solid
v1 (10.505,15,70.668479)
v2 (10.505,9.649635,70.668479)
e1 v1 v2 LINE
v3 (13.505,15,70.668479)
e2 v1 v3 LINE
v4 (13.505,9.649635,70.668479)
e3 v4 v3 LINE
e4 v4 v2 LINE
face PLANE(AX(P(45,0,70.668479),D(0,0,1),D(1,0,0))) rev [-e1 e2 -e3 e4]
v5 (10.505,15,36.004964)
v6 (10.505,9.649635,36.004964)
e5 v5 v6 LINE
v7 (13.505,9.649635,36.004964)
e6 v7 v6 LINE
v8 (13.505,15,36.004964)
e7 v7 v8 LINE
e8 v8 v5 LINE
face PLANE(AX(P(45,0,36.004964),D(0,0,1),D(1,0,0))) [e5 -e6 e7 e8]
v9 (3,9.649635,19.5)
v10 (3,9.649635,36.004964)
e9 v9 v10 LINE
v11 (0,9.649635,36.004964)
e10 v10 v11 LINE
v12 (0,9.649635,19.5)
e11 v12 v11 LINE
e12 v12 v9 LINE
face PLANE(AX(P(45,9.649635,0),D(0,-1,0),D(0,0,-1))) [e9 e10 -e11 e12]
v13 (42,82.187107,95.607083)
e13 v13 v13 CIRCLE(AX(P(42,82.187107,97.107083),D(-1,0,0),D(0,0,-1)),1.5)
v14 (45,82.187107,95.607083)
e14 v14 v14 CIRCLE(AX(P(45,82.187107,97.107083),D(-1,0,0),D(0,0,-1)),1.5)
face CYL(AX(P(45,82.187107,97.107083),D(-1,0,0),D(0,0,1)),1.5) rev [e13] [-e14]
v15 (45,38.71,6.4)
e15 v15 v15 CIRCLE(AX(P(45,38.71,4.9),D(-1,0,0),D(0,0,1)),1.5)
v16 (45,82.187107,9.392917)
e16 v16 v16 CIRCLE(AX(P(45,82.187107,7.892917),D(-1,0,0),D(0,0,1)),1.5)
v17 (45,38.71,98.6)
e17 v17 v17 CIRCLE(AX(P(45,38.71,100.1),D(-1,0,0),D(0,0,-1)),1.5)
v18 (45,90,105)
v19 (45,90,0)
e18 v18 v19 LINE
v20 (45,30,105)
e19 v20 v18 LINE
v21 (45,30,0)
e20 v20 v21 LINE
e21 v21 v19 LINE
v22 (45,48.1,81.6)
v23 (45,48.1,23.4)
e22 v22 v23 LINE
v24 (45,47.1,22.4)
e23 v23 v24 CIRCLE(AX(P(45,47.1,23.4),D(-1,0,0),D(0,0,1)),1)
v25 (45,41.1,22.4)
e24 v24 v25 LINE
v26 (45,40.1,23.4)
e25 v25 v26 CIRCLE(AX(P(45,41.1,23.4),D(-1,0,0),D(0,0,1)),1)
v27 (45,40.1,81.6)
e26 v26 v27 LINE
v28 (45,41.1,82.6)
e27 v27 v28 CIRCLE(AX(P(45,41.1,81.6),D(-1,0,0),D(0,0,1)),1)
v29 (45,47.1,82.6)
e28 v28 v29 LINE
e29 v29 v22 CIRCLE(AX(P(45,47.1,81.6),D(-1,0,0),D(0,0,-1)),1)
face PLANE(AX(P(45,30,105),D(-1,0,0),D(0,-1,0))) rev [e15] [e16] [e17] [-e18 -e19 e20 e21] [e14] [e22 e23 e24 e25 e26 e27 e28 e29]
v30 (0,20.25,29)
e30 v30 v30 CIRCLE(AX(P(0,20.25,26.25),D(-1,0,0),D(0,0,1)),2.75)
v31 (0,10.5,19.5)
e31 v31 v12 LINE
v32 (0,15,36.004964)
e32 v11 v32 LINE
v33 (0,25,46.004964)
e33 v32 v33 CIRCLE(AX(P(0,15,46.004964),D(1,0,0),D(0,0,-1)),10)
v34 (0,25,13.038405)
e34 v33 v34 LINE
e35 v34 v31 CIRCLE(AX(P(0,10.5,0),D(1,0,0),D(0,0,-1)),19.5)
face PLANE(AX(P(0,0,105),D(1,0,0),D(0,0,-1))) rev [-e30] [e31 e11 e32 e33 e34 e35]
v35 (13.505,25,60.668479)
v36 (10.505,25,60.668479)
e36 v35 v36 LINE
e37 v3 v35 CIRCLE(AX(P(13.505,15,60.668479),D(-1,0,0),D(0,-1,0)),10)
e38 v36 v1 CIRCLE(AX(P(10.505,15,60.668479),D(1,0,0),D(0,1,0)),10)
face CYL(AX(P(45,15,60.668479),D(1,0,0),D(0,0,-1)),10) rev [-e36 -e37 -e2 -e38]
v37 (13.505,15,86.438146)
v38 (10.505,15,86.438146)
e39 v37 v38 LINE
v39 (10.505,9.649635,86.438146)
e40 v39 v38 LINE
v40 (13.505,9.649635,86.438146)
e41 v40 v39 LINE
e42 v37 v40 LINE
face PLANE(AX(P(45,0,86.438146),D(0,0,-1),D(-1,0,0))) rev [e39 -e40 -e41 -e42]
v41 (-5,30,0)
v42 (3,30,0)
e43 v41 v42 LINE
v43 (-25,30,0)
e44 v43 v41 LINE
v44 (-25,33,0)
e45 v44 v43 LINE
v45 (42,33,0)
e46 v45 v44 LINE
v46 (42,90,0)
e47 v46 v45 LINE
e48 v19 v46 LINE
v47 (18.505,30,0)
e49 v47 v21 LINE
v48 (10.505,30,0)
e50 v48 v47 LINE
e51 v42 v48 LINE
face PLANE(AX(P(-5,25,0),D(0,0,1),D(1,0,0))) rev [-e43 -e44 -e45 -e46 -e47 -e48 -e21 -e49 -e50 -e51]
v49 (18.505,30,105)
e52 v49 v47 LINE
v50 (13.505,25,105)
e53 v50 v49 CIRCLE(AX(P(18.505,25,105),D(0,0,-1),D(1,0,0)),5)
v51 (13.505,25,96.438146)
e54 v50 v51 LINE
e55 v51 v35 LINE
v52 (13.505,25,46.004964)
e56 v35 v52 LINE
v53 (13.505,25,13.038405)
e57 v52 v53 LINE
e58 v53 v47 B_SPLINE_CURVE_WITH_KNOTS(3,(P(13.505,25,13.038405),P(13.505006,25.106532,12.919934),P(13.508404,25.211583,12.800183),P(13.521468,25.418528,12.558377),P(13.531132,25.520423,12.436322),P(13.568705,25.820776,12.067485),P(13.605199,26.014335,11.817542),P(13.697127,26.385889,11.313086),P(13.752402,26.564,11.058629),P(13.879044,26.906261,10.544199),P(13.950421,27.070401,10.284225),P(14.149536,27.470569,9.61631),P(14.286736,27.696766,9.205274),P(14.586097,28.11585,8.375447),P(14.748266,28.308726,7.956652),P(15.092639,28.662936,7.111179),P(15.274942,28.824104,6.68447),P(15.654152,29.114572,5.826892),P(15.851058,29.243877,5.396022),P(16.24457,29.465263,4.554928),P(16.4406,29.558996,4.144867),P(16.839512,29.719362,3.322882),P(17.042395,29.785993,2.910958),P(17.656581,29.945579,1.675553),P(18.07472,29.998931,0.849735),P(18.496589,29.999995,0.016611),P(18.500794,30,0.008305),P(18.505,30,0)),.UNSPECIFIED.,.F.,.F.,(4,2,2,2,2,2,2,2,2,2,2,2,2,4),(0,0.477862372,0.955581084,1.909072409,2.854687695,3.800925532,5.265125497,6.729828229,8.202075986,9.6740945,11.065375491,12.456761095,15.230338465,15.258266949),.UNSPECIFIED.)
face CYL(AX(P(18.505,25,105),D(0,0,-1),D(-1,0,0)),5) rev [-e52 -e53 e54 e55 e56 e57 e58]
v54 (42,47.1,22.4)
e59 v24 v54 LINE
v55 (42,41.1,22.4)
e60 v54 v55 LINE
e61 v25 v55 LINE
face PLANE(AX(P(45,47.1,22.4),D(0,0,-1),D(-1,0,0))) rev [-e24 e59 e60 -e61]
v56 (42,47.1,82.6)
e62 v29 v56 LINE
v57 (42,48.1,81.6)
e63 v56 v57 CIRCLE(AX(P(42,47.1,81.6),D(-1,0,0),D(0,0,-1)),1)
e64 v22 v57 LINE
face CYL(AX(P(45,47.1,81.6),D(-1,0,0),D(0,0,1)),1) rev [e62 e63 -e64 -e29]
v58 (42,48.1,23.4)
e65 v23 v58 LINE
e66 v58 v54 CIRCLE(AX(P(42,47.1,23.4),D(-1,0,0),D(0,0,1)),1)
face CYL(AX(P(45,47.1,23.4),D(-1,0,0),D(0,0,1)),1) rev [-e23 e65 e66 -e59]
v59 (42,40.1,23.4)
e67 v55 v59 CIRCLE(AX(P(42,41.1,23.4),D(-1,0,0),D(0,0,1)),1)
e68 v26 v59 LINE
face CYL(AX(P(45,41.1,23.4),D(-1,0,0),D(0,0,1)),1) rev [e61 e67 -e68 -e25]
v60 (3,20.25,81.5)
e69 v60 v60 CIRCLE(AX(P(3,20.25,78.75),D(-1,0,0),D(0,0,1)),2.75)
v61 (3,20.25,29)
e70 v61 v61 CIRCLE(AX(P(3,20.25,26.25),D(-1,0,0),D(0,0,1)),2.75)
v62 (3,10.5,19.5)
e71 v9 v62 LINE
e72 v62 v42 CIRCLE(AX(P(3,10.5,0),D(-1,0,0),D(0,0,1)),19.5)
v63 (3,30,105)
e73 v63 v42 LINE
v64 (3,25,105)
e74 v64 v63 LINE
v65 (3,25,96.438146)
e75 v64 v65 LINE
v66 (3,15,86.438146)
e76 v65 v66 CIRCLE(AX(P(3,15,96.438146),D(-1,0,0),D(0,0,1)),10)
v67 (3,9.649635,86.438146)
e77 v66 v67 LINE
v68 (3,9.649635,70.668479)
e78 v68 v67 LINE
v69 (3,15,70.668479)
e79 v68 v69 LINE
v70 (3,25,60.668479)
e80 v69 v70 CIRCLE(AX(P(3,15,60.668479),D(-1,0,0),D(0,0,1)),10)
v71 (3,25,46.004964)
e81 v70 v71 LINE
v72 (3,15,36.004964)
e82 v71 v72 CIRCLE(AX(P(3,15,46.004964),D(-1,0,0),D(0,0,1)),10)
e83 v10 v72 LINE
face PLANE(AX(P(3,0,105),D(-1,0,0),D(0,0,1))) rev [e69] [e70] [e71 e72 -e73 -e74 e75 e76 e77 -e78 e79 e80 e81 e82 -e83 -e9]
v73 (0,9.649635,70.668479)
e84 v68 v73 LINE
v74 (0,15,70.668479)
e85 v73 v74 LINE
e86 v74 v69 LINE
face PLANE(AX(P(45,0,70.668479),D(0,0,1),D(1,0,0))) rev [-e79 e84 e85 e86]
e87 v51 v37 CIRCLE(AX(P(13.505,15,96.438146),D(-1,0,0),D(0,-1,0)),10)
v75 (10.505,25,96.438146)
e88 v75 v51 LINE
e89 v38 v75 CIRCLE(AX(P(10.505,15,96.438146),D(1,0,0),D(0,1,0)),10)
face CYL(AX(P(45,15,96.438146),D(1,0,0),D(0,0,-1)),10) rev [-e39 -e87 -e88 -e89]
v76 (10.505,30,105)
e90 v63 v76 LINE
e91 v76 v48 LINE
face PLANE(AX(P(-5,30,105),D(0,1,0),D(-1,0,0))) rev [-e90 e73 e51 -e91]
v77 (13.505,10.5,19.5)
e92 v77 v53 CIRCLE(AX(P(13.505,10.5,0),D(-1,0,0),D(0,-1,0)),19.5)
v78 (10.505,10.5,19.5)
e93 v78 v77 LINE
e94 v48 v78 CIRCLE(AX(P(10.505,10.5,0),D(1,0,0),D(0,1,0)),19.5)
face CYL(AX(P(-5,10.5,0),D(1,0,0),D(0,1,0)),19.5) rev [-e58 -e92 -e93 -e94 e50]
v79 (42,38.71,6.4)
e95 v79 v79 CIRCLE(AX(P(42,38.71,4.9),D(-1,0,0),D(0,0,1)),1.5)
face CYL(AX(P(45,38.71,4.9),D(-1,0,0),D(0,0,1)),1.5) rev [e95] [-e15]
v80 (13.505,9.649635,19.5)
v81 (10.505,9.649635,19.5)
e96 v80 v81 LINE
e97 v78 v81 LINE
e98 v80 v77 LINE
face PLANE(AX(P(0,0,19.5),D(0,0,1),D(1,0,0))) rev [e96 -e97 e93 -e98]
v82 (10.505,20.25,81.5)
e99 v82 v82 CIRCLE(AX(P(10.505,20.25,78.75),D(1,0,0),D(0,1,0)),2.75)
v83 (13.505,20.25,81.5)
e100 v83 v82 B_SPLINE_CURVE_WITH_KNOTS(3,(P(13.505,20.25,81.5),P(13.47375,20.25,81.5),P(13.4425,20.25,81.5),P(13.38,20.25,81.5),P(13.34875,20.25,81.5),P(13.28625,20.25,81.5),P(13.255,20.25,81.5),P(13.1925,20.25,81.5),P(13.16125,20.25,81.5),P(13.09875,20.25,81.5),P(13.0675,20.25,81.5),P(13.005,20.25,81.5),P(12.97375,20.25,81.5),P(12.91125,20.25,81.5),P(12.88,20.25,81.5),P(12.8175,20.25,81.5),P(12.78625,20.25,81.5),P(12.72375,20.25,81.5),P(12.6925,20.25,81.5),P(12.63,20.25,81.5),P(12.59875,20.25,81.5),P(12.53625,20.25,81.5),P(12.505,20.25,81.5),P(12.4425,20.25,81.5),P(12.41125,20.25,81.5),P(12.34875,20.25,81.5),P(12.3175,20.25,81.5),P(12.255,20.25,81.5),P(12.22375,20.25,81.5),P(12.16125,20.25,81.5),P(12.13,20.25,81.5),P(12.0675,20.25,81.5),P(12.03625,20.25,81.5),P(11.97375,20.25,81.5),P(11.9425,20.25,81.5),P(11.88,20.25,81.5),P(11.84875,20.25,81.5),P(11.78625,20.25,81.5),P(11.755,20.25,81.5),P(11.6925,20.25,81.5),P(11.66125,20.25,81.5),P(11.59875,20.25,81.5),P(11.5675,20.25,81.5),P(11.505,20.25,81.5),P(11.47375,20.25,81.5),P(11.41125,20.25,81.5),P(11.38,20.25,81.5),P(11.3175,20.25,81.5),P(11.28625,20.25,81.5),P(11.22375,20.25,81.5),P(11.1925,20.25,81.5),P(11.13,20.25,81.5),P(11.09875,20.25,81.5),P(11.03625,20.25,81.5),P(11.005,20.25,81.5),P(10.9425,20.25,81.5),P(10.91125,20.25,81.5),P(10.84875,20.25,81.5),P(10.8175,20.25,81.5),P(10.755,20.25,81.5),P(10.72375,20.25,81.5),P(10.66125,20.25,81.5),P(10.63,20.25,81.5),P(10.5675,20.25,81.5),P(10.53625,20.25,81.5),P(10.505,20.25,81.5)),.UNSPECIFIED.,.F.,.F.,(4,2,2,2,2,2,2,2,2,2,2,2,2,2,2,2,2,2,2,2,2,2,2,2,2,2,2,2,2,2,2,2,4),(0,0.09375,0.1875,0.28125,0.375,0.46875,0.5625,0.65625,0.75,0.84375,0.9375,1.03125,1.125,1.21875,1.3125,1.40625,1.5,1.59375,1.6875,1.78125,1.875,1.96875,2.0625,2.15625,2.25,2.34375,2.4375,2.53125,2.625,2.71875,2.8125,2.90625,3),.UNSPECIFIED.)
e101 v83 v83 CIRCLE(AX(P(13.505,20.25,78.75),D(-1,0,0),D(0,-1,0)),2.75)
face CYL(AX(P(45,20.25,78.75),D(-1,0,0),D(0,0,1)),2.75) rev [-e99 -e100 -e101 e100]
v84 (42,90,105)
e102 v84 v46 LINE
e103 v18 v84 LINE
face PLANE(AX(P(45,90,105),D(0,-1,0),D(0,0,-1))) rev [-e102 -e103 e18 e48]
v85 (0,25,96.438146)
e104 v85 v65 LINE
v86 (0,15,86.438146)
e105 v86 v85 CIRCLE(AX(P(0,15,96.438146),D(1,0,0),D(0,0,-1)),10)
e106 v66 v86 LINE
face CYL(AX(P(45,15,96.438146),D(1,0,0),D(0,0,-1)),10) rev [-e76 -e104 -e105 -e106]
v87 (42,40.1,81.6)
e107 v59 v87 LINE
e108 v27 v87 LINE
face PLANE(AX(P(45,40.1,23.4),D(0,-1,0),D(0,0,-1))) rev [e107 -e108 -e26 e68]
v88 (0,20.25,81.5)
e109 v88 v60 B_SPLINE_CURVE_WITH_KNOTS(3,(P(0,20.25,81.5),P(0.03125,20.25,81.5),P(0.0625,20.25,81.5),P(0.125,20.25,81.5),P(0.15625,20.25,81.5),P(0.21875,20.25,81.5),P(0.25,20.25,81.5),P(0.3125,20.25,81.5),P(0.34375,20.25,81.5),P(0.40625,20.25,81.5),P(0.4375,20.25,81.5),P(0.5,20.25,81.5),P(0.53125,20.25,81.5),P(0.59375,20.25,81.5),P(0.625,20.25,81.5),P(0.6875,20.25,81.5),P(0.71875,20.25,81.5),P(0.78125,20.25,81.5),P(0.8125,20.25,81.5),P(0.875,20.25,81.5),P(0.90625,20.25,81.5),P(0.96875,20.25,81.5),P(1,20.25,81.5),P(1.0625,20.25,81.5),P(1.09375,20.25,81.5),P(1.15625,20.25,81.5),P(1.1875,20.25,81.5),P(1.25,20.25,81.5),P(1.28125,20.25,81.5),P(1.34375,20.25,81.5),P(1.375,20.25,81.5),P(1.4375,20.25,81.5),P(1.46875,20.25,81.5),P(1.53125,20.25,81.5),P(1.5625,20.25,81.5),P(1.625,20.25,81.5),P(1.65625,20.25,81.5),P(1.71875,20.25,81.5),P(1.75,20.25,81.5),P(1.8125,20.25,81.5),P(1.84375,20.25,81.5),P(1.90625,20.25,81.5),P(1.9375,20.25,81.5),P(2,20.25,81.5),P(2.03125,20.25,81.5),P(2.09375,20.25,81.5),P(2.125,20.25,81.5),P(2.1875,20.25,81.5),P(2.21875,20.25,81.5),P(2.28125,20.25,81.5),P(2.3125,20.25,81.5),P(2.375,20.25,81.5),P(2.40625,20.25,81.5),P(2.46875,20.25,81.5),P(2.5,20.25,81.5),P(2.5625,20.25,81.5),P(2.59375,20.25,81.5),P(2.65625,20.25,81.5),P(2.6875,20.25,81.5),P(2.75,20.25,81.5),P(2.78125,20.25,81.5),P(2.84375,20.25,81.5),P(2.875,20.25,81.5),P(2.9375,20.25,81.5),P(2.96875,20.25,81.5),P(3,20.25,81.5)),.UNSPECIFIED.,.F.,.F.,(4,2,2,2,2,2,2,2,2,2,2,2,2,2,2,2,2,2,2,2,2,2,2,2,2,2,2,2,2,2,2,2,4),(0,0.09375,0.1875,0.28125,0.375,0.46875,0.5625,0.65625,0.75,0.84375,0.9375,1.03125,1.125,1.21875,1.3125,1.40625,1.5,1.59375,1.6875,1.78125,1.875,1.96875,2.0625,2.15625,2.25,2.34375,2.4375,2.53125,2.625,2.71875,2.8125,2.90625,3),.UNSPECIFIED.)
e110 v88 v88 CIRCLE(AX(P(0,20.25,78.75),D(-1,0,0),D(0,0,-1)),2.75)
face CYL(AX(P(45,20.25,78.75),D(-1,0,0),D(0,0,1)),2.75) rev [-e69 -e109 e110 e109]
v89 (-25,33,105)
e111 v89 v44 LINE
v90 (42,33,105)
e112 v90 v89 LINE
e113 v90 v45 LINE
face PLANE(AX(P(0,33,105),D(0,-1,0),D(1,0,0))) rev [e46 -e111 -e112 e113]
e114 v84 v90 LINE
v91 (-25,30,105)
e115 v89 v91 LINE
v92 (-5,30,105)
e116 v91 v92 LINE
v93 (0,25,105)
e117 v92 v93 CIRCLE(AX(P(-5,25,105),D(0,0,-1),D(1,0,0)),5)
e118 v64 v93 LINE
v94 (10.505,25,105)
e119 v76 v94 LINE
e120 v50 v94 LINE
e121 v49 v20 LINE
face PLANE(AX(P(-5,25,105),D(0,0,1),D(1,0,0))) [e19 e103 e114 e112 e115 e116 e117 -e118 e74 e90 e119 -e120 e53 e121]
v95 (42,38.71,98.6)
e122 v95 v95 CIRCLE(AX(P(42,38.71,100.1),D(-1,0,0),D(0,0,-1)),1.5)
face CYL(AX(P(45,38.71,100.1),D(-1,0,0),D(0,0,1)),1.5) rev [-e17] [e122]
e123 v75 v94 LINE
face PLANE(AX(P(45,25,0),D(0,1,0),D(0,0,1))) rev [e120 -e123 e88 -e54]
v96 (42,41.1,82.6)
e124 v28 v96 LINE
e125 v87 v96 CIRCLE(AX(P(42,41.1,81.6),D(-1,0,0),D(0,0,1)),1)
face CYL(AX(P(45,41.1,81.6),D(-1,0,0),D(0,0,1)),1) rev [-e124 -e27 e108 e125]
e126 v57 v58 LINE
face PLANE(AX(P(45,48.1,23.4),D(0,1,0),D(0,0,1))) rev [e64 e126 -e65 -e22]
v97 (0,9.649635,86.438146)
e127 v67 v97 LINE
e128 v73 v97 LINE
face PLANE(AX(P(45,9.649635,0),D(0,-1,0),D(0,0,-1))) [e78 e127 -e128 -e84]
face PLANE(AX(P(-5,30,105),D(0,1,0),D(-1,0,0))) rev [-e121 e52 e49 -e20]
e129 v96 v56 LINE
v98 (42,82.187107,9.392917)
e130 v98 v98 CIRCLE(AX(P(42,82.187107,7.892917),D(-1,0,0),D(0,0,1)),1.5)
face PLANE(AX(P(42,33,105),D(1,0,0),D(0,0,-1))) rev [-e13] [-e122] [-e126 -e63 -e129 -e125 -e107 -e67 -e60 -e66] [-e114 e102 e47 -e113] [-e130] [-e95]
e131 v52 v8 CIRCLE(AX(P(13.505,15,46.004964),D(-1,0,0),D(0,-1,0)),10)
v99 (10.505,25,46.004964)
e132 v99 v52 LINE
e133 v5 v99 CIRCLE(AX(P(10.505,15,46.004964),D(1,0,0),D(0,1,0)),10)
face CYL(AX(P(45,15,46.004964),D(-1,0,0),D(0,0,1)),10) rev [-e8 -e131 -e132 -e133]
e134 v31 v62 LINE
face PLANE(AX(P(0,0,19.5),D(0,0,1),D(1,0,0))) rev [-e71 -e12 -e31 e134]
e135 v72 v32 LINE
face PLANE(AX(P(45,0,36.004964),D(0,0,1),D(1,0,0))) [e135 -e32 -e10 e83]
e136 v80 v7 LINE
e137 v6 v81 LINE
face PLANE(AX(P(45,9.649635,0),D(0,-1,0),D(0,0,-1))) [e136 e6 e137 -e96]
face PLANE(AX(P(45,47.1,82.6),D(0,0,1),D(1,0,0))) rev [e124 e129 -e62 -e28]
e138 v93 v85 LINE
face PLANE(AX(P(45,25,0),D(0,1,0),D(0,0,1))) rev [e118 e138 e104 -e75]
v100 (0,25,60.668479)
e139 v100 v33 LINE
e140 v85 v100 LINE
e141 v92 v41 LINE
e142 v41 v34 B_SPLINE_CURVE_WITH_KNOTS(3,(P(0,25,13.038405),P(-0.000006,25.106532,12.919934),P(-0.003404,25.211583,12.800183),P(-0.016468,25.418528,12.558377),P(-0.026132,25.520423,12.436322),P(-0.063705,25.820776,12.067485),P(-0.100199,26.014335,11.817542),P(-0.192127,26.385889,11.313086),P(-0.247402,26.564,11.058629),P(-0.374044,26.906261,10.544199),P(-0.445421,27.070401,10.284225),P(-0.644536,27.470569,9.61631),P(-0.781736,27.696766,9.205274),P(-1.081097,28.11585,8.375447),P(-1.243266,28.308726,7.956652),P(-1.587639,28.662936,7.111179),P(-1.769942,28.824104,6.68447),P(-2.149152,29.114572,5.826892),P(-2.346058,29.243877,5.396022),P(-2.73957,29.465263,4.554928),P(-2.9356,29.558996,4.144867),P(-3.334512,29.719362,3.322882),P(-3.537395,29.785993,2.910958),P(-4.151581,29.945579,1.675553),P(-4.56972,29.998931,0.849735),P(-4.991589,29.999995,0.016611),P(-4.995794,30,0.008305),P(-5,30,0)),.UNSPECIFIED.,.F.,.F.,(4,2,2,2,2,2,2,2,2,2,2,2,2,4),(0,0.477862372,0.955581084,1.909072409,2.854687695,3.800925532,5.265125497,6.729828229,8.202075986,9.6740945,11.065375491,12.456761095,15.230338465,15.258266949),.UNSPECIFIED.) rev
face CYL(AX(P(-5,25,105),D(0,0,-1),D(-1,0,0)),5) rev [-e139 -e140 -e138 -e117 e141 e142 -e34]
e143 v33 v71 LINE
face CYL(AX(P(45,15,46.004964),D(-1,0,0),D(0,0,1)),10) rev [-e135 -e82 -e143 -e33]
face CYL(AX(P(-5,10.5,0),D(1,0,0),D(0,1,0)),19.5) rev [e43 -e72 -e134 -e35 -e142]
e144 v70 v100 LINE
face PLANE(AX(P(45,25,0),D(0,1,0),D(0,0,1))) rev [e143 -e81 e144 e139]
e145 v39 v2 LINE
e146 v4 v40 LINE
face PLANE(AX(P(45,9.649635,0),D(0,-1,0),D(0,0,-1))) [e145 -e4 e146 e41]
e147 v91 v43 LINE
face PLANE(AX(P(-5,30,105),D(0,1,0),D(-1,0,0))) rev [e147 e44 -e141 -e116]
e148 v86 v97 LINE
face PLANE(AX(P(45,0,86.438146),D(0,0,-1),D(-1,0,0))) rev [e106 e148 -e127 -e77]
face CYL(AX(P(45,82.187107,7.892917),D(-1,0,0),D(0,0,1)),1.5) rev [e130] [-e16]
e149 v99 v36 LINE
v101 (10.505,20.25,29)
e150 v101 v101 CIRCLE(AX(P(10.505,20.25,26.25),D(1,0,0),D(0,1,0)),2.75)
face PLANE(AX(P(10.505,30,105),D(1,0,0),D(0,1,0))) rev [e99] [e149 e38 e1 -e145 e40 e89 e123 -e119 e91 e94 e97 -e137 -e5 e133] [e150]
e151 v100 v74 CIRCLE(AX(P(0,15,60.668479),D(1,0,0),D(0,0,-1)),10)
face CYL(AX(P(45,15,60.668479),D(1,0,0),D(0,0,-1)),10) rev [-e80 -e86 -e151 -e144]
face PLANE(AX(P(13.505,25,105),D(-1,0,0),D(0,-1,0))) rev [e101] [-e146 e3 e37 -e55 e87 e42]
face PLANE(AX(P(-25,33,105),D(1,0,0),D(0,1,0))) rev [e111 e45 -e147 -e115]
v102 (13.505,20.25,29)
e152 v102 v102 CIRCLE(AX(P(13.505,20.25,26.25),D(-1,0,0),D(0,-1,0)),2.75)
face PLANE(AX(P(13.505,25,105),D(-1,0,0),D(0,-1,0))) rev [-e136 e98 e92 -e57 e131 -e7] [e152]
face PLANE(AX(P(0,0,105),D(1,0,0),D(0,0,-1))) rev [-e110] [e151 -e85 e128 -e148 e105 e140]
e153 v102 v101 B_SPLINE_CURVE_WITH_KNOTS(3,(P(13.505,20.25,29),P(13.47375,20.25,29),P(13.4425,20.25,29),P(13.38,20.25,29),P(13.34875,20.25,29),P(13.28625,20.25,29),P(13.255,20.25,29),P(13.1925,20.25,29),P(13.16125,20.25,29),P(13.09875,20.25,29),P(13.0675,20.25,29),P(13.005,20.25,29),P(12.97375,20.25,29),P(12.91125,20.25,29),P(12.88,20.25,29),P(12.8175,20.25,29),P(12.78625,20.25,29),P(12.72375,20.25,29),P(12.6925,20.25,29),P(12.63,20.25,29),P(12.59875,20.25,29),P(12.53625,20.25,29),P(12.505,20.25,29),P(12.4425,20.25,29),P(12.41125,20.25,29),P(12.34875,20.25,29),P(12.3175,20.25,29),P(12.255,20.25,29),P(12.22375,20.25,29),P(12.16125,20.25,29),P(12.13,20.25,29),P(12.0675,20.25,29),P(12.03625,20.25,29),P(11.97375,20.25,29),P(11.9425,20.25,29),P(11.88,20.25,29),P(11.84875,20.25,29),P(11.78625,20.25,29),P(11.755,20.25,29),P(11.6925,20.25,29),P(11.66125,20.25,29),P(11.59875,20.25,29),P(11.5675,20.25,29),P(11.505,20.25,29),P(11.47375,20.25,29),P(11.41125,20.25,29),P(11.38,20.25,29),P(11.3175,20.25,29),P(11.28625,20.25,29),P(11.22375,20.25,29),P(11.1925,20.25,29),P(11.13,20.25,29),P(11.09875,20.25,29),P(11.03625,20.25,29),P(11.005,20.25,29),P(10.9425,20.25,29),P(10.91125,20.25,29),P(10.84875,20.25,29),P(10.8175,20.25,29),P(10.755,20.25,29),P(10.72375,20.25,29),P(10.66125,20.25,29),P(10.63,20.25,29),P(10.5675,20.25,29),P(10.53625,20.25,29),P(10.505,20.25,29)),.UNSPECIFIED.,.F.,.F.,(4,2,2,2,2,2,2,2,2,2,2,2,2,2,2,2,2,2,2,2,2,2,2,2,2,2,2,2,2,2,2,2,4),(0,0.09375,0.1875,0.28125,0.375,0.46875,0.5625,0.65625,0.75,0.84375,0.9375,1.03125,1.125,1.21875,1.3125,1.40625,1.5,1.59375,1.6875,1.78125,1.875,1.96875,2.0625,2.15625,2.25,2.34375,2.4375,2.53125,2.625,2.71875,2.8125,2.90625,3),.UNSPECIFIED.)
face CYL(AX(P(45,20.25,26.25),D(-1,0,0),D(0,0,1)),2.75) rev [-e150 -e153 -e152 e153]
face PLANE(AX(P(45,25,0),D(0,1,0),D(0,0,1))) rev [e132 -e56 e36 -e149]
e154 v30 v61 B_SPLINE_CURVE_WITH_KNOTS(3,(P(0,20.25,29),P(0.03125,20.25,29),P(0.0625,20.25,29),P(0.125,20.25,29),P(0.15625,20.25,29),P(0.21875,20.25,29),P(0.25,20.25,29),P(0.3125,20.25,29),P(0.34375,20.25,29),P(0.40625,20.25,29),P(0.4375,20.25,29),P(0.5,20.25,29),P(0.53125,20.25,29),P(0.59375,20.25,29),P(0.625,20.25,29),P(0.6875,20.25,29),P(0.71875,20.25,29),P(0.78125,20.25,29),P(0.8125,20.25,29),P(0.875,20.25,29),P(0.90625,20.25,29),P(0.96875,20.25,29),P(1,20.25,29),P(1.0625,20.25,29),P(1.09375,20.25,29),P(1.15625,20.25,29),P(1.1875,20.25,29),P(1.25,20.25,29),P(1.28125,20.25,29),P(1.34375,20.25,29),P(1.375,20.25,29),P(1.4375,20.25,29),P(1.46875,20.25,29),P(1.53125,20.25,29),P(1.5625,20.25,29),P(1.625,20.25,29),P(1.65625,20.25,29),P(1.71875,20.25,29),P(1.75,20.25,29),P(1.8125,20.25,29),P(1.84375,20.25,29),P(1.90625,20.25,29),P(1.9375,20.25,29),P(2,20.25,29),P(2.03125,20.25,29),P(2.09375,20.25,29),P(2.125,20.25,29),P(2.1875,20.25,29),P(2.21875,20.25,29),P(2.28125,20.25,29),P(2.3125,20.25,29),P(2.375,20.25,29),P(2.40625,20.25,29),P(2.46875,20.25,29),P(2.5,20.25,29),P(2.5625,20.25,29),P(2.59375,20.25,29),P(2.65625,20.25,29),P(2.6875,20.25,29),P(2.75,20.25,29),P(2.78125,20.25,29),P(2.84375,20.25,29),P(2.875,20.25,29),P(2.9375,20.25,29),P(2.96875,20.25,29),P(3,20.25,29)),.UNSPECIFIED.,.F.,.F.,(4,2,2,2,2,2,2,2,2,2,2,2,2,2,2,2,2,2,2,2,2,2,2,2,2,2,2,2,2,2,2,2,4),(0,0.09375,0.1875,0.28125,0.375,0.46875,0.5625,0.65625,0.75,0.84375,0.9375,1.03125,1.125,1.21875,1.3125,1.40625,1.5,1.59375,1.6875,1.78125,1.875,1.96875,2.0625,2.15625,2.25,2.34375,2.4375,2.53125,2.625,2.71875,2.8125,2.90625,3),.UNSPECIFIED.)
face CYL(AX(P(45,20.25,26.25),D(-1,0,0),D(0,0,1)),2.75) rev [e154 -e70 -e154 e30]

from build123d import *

# Parameters (mm, degrees)
BOSS_EXTRUDE1_DEPTH = 105
SKETCH3_R           = 2.75
CUT_EXTRUDE1_DEPTH  = 146.430395722
SKETCH5_R           = 1.5
CUT_EXTRUDE2_DEPTH  = 154.668474321
SKETCH7_W           = 24.871294837
SKETCH7_H           = 30
CUT_EXTRUDE5_DEPTH  = 19.5
FILLET1_R           = 19.5
CUT_EXTRUDE6_DEPTH  = 154.668474389
CUT_EXTRUDE8_DEPTH  = 146.430395795
FILLET2_R           = 10


with BuildPart() as part:
    # Sketch2 → Boss-Extrude1 (new body)
    with BuildSketch(Plane.XY):
        with BuildLine():
            Line((18.505, 30), (45, 30))
            Line((45, 30), (45, 90))
            Line((45, 90), (42, 90))
            Line((42, 90), (42, 33))
            Line((42, 33), (0, 33))
            Line((0, 33), (-25, 33))
            Line((-25, 33), (-25, 30))
            Line((-25, 30), (-5, 30))
            ThreePointArc((-5, 30), (-1.464466094, 28.535533906), (0, 25))
            Line((0, 25), (0, 0))
            Line((0, 0), (3, 0))
            Line((3, 0), (3, 30))
            Line((3, 30), (10.505, 30))
            Line((10.505, 30), (10.505, 0))
            Line((10.505, 0), (13.505, 0))
            Line((13.505, 0), (13.505, 25))
            ThreePointArc((13.505, 25), (14.969466094, 28.535533906), (18.505, 30))
        make_face()
    extrude(amount=BOSS_EXTRUDE1_DEPTH)

    # Sketch3 → Cut-Extrude1 (cut, through all)
    with BuildSketch(Plane.ZY):
        with Locations((26.25, 20.25)):
            Circle(SKETCH3_R)
        with Locations((78.75, 20.25)):
            Circle(SKETCH3_R)
    extrude(amount=-CUT_EXTRUDE1_DEPTH, mode=Mode.SUBTRACT)

    # Sketch5 → Cut-Extrude2 (cut, through all)
    with BuildSketch(Plane.ZY.offset(-42)):
        with Locations((4.9, 38.71)):
            Circle(SKETCH5_R)
        with Locations(Location((100.1, 38.71, 0), (0, 0, 180))):
            Circle(SKETCH5_R)
        with Locations((7.892916969, 82.187107172)):
            Circle(SKETCH5_R)
        with Locations(Location((97.107083031, 82.187107172, 0), (0, 0, 180))):
            Circle(SKETCH5_R)
    extrude(amount=-CUT_EXTRUDE2_DEPTH, mode=Mode.SUBTRACT)

    # Sketch7 → Cut-Extrude5 (cut)
    with BuildSketch(Plane(origin=(0, 0, 0), x_dir=(-1, 0, 0), z_dir=(0, 0, -1))):
        with Locations((-6.069352582, 15)):
            Rectangle(SKETCH7_W, SKETCH7_H)
    extrude(amount=-CUT_EXTRUDE5_DEPTH, mode=Mode.SUBTRACT)

    # Fillet1
    fillet1_edges = [part.edges().sort_by_distance(p)[0] for p in [
        (-1, 30, 19.5),
        (14.505, 30, 19.5),
    ]]
    fillet(fillet1_edges, radius=FILLET1_R - 0.0001)  # a hair under: the kernel refuses the full size

    # Sketch9 → Cut-Extrude6 (cut, through all)
    with BuildSketch(Plane.ZY.offset(-42)):
        with BuildLine():
            Line((23.4, 48.1), (81.6, 48.1))
            ThreePointArc((81.6, 48.1), (82.307106781, 47.807106781), (82.6, 47.1))
            Line((82.6, 47.1), (82.6, 41.1))
            ThreePointArc((82.6, 41.1), (82.307106781, 40.392893219), (81.6, 40.1))
            Line((81.6, 40.1), (23.4, 40.1))
            ThreePointArc((23.4, 40.1), (22.692893219, 40.392893219), (22.4, 41.1))
            Line((22.4, 41.1), (22.4, 47.1))
            ThreePointArc((22.4, 47.1), (22.692893219, 47.807106781), (23.4, 48.1))
        make_face()
    extrude(amount=-CUT_EXTRUDE6_DEPTH, mode=Mode.SUBTRACT)

    # Sketch10 → Cut-Extrude8 (cut, through all)
    with BuildSketch(Plane.ZY):
        Polygon((19.5, 0), (36.004964036, 0), (70.668478518, 0), (86.438146051, 0), (105, 0), (105, 9.649634618), (105, 25), (86.438146051, 25), (86.438146051, 9.649634618), (70.668478518, 9.649634618), (70.668478518, 25), (36.004964036, 25), (36.004964036, 9.649634618), (19.5, 9.649634618), align=None)
    extrude(amount=-CUT_EXTRUDE8_DEPTH, mode=Mode.SUBTRACT)

    # Fillet2
    fillet2_edges = [part.edges().sort_by_distance(p)[0] for p in [
        (1.5, 25, 36.004964036),
        (12.005, 25, 36.004964036),
        (1.5, 25, 70.668478518),
        (12.005, 25, 70.668478518),
        (1.5, 25, 86.438146051),
        (12.005, 25, 86.438146051),
    ]]
    fillet(fillet2_edges, radius=FILLET2_R)


solid = part.part
